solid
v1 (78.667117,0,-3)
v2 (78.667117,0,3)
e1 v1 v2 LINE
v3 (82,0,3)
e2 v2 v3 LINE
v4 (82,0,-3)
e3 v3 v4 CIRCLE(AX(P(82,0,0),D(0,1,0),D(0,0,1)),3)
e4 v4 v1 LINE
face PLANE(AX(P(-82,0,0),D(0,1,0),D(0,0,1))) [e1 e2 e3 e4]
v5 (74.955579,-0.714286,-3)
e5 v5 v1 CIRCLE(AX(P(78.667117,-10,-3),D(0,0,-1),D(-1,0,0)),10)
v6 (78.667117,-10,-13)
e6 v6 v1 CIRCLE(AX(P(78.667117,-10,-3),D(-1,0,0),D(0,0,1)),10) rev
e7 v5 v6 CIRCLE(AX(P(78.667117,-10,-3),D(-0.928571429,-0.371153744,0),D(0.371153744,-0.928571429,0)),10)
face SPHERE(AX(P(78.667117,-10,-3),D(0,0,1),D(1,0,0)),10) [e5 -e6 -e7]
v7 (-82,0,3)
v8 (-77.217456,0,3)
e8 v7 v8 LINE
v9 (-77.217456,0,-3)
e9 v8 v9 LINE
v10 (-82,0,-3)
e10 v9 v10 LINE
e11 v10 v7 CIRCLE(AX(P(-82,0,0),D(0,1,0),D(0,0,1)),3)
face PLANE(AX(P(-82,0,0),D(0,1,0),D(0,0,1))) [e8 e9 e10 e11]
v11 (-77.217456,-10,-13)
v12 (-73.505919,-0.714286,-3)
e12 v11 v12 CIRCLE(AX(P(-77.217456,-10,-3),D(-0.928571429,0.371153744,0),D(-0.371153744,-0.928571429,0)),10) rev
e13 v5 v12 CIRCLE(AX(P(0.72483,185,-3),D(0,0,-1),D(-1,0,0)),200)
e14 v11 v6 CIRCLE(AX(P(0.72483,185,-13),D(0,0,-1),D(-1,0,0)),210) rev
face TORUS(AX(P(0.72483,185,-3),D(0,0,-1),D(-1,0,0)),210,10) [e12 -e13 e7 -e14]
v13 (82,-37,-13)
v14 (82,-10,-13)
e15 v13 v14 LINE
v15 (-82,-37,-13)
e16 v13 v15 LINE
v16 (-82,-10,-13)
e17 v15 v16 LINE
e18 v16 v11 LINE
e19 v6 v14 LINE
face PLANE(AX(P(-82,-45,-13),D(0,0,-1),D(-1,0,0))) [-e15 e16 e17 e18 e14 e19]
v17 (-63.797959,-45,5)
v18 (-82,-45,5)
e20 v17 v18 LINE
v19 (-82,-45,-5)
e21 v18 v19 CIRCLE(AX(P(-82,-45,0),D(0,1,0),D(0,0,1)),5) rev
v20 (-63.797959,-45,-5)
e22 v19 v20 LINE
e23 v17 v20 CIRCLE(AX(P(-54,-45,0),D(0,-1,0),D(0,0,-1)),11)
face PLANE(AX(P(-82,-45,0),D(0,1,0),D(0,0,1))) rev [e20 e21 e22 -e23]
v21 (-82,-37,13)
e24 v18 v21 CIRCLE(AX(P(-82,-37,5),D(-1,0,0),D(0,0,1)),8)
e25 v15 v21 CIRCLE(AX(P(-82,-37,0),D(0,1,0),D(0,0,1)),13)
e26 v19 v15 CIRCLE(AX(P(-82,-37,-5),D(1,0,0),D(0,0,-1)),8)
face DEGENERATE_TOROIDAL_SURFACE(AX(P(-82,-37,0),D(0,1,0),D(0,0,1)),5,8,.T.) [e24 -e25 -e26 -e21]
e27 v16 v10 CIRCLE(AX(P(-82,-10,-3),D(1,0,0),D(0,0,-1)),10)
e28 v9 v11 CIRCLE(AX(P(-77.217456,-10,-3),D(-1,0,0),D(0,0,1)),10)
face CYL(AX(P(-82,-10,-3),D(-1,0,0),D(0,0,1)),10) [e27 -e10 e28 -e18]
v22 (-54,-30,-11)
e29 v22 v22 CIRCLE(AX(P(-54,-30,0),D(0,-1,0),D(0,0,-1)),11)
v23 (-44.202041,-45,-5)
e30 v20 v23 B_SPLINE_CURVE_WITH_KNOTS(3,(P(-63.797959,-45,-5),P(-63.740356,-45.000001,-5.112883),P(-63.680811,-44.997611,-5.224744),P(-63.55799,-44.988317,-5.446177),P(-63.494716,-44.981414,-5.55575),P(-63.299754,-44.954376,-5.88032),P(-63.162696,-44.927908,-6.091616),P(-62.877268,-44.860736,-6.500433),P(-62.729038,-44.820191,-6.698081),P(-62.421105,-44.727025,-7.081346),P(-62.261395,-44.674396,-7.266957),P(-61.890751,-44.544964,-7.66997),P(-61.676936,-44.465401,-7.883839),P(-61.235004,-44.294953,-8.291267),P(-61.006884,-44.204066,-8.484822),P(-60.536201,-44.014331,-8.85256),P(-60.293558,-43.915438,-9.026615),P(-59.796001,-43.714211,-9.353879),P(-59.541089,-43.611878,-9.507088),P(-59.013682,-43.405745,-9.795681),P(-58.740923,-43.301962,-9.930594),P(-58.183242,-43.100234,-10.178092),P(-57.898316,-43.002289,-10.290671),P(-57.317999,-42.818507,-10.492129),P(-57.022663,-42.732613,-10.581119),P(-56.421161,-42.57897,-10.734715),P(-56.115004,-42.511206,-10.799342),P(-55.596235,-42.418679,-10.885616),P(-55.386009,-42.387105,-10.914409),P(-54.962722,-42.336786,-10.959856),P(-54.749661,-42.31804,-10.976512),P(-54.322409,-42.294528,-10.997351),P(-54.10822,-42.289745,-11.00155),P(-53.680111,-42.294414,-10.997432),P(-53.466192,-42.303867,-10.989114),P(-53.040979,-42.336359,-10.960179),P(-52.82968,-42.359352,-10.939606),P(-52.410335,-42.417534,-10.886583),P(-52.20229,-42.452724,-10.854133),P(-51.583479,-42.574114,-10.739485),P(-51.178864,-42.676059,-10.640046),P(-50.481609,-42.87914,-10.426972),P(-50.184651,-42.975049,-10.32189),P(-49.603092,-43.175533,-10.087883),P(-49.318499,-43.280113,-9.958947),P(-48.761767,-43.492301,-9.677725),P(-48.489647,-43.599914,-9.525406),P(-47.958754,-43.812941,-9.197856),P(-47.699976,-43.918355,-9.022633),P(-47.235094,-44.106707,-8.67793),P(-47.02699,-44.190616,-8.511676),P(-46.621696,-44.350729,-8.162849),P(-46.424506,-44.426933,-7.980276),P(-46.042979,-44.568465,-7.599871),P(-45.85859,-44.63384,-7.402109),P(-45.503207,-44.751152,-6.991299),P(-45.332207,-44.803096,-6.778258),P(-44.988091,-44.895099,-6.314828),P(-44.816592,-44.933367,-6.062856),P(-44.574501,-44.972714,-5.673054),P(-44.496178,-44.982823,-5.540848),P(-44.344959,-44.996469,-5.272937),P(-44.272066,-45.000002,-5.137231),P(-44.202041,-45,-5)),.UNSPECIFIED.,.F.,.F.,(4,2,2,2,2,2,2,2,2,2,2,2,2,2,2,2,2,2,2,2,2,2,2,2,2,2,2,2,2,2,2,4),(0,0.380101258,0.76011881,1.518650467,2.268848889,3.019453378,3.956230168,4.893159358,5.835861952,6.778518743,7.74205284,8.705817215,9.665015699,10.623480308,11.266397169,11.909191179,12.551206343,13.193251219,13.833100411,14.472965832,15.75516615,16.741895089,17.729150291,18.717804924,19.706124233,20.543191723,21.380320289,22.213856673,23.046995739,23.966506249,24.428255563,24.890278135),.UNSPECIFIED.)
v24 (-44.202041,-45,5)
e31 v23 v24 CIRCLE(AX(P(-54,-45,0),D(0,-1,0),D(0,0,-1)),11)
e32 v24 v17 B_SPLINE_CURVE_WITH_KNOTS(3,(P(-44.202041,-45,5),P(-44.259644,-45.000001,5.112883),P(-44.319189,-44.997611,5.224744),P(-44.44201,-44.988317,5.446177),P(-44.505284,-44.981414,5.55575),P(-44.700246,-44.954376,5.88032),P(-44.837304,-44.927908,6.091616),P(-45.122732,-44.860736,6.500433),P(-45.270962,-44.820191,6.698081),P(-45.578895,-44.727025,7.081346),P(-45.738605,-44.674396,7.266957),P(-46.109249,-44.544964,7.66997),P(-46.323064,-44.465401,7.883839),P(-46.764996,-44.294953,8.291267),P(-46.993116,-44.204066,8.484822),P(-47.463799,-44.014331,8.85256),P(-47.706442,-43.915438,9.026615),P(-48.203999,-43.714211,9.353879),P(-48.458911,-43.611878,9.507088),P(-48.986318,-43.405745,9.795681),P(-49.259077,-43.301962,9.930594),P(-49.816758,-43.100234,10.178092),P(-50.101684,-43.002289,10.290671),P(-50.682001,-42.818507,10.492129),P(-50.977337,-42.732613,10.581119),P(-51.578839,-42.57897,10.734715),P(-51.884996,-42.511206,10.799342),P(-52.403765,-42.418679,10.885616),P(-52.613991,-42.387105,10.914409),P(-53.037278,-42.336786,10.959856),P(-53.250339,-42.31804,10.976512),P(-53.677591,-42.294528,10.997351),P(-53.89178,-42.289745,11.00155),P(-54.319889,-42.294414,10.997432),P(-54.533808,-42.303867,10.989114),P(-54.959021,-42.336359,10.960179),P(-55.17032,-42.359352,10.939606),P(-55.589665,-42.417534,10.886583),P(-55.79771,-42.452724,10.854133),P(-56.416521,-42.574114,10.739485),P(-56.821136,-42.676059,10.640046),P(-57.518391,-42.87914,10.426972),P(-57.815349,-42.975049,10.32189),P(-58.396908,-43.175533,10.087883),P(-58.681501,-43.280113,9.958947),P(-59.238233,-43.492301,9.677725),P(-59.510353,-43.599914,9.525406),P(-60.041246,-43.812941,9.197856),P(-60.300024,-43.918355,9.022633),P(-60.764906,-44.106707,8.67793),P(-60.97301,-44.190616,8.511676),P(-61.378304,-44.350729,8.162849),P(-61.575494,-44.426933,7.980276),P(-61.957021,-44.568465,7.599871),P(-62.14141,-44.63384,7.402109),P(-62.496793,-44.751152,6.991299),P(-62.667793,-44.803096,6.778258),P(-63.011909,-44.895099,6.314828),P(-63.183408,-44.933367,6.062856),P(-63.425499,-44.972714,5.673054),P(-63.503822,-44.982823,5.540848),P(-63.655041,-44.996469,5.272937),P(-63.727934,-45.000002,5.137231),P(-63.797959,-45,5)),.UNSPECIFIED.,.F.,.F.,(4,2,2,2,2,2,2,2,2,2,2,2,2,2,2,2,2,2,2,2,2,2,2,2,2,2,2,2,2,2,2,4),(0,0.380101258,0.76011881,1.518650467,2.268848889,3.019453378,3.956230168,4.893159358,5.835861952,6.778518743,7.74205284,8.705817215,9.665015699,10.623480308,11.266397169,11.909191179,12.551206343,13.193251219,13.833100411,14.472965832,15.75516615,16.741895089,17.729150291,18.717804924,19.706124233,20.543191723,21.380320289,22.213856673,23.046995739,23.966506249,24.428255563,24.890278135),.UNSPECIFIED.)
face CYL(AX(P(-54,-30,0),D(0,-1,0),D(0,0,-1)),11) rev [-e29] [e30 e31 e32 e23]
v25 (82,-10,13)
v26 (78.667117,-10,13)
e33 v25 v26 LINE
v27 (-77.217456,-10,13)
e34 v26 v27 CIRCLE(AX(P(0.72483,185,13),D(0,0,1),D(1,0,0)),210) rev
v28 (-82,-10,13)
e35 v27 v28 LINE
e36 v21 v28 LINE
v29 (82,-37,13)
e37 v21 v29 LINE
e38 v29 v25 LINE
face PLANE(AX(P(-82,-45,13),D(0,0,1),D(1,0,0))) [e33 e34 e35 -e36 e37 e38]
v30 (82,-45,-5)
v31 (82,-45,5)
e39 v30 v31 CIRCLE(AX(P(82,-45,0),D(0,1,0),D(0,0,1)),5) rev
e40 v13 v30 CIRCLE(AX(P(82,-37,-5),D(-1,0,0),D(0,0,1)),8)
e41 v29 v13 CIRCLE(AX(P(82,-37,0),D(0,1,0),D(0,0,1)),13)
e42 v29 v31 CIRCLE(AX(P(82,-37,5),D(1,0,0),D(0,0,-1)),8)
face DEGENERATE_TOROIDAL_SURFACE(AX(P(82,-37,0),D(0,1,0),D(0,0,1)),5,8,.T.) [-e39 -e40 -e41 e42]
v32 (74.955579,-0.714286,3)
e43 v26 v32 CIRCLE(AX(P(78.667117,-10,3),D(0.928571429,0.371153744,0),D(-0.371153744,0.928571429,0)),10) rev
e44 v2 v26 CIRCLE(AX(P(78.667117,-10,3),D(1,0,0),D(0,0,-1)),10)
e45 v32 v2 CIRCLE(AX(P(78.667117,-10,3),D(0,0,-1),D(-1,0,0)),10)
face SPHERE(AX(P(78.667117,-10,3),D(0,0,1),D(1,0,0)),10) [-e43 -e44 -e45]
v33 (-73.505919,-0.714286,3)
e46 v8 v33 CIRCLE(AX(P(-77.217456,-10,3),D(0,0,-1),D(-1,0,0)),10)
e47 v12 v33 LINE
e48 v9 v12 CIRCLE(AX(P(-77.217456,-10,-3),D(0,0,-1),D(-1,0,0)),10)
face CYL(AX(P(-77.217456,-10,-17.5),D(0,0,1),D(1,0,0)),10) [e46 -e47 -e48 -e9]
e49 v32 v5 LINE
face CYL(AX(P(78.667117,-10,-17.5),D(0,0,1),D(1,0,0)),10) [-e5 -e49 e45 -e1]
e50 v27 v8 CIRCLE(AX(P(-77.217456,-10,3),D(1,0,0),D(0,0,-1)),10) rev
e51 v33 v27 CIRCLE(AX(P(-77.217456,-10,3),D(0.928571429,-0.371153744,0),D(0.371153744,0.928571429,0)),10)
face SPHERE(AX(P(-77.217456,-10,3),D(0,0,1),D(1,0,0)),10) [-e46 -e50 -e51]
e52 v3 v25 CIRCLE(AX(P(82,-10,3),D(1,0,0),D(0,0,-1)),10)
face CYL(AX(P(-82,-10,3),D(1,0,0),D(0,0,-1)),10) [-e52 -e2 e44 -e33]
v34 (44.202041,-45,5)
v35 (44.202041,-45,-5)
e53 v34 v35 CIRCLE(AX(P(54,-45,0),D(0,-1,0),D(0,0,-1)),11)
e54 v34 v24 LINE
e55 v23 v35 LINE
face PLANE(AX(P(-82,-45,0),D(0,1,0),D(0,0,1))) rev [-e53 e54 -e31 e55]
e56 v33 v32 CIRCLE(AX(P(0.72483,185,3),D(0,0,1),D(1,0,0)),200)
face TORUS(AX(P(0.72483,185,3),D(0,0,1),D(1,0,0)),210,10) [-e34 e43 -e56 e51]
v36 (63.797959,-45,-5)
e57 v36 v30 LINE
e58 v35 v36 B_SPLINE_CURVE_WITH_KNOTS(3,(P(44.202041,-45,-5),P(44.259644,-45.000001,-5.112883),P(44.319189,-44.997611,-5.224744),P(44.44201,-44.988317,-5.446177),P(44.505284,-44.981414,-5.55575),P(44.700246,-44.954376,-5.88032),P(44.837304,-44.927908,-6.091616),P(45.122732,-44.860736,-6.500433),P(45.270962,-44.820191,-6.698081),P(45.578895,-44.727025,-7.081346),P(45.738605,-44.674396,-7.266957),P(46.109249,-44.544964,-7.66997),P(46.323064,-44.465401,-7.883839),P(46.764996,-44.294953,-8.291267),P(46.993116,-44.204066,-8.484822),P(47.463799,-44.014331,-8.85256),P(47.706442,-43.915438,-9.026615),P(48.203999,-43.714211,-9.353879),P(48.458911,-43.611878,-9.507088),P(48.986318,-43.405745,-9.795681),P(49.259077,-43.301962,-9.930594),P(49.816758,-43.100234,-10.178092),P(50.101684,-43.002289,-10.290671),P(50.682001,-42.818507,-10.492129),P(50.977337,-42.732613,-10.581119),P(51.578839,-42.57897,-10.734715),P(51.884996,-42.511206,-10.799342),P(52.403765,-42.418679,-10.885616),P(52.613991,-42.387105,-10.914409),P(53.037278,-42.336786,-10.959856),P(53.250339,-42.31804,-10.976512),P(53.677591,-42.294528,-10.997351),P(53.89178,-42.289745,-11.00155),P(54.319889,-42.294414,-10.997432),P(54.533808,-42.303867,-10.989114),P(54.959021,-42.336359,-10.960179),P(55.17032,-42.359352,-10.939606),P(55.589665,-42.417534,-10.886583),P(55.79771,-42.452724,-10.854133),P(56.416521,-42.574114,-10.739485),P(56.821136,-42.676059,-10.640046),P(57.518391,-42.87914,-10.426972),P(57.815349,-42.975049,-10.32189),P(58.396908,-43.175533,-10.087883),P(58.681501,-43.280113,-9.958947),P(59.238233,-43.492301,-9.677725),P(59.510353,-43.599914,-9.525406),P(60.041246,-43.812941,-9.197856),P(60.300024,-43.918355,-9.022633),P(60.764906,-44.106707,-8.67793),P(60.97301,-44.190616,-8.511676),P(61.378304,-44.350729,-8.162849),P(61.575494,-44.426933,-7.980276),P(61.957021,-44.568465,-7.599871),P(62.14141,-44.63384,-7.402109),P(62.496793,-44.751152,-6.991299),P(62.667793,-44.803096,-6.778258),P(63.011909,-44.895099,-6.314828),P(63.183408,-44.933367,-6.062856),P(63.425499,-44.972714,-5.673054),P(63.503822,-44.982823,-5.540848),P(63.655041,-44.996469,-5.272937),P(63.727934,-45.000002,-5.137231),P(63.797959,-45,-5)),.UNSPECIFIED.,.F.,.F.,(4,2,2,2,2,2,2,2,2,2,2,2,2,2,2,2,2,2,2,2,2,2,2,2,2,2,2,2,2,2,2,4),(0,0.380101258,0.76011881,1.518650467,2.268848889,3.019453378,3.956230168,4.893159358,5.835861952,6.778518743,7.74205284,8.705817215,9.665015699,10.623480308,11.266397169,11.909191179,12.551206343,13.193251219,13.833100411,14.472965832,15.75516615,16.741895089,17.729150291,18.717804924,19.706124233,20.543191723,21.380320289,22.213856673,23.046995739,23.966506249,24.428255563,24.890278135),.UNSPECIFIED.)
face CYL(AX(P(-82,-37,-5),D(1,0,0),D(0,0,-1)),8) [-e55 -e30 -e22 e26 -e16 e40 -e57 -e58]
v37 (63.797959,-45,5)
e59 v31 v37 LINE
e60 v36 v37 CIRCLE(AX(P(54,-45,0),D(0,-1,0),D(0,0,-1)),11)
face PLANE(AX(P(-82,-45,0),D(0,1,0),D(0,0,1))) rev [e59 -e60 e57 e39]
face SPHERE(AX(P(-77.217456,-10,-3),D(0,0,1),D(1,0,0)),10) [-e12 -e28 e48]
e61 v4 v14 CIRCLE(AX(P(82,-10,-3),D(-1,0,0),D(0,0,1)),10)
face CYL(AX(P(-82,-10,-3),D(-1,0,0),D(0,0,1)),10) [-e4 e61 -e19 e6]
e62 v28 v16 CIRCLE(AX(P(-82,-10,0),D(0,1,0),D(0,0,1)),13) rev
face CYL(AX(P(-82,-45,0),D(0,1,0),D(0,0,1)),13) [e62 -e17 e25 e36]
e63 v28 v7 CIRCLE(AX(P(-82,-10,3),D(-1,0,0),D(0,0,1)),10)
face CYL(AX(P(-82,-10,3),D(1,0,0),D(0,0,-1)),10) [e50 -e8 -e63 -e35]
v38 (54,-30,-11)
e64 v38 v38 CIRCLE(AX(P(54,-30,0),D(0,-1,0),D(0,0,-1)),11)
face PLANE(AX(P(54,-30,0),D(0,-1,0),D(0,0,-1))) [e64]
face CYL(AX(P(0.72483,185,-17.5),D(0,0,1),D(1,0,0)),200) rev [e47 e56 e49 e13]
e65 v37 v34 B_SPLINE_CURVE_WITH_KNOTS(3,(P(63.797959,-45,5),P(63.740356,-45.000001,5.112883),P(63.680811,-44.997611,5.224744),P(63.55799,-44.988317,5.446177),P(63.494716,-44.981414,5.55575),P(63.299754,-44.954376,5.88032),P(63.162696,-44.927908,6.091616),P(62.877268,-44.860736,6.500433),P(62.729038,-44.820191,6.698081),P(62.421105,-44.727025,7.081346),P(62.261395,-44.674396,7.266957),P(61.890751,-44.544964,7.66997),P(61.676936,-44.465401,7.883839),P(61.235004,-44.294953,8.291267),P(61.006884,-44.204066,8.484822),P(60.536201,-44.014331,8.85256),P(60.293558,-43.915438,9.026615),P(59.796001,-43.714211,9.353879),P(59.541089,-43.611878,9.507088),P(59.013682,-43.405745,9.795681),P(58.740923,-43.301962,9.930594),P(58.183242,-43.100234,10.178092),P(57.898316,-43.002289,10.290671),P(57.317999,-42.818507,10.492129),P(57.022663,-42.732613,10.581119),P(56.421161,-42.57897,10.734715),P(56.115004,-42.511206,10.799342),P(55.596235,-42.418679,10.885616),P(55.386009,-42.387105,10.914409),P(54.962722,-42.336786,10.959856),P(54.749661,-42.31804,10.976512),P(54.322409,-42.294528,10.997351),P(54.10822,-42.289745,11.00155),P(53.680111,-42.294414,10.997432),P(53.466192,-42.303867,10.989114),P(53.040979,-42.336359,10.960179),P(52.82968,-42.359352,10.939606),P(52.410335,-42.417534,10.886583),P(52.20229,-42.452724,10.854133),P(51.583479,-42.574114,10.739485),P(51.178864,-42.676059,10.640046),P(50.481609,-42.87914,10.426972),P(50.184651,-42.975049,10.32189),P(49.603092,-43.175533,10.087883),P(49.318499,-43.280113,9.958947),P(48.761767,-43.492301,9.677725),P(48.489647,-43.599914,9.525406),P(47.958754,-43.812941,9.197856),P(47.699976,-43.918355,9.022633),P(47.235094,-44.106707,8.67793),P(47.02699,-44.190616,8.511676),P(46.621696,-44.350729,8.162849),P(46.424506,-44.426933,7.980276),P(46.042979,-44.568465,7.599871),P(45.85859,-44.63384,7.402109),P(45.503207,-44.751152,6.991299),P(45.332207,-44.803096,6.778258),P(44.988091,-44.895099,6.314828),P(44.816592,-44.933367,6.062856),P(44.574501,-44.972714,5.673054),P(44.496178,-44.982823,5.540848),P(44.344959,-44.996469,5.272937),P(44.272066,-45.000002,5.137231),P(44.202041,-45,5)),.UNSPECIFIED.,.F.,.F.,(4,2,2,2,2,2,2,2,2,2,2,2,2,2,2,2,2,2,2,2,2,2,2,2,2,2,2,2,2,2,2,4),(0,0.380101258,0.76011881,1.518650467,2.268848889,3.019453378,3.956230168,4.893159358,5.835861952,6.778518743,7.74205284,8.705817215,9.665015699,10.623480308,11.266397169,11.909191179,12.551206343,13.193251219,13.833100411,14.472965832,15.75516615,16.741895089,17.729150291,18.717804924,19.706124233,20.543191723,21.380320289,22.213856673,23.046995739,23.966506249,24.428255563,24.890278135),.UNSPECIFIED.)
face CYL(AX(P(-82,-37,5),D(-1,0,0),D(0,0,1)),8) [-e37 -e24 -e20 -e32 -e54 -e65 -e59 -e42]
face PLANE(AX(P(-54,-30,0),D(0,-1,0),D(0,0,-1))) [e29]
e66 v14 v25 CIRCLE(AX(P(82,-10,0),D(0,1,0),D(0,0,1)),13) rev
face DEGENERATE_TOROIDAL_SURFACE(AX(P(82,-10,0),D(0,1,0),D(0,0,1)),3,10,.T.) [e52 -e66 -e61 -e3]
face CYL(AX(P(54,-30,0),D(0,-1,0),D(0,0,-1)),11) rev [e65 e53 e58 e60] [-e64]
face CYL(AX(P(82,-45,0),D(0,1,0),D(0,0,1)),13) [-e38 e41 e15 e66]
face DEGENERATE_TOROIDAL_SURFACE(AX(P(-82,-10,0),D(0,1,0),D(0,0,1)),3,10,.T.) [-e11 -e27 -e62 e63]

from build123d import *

# Parameters (mm, degrees)
BOSS_EXTRUDE1_DEPTH = 45
SKETCH2_R           = 11
CUT_EXTRUDE1_DEPTH  = 15
SKETCH4_R           = 200
CUT_EXTRUDE2_DEPTH  = 17.5
FILLET1_R           = 8
FILLET2_R           = 10
FILLET3_R           = 10


with BuildPart() as part:
    # Sketch1 → Boss-Extrude1 (new body)
    with BuildSketch(Plane(origin=(0, 0, 0), x_dir=(1, 0, 0), z_dir=(0, 1, 0))):
        with BuildLine():
            Line((-82, 13), (82, 13))
            ThreePointArc((82, 13), (95, 0), (82, -13))
            Line((82, -13), (-82, -13))
            ThreePointArc((-82, -13), (-95, 0), (-82, 13))
        make_face()
    extrude(amount=-BOSS_EXTRUDE1_DEPTH)

    # Sketch2 → Cut-Extrude1 (cut)
    with BuildSketch(Plane.XZ.offset(45)):
        with Locations(Location((-54, 0, 0), (0, 0, 270))):
            Circle(SKETCH2_R)
        with Locations(Location((54, 0, 0), (0, 0, 270))):
            Circle(SKETCH2_R)
    extrude(amount=-CUT_EXTRUDE1_DEPTH, mode=Mode.SUBTRACT)

    # Sketch4 → Cut-Extrude2 (cut, symmetric)
    with BuildSketch(Plane.XY):
        with Locations((0.724830201, 185)):
            Circle(SKETCH4_R)
    extrude(amount=CUT_EXTRUDE2_DEPTH, both=True, mode=Mode.SUBTRACT)

    # Fillet1
    # the kernel refuses this fillet: 8 mm, written as the material it takes off along each edge
    with BuildSketch(Plane(origin=(82, -45, 0), x_dir=(0, 0, -1), z_dir=(-1, 0, 0))) as fillet1_piece_1:
        with BuildLine():
            CenterArc((13 - FILLET1_R, -FILLET1_R), FILLET1_R, 0, 90)
            Line((13, -FILLET1_R), (13, 0))
            Line((13, 0), (13 - FILLET1_R, 0))
        make_face()
    revolve(axis=Axis((82, -45, 0), (0, -1, 0)), revolution_arc=180, mode=Mode.SUBTRACT)
    with BuildSketch(Plane(origin=(-82, -45, -13), x_dir=(0, 0, 1), z_dir=(1, 0, 0))) as fillet1_piece_2:
        with BuildLine():
            CenterArc((FILLET1_R, -FILLET1_R), FILLET1_R, 90, 90)
            Line((0, -FILLET1_R), (0, 0))
            Line((0, 0), (FILLET1_R, 0))
        make_face()
    extrude(amount=164, mode=Mode.SUBTRACT)
    with BuildSketch(Plane(origin=(-82, -45, 0), x_dir=(0, 0, 1), z_dir=(1, 0, 0))) as fillet1_piece_3:
        with BuildLine():
            CenterArc((13 - FILLET1_R, -FILLET1_R), FILLET1_R, 0, 90)
            Line((13 - FILLET1_R, 0), (13, 0))
            Line((13, 0), (13, -FILLET1_R))
        make_face()
    revolve(axis=Axis((-82, -45, 0), (0, -1, 0)), revolution_arc=180, mode=Mode.SUBTRACT)
    with BuildSketch(Plane(origin=(82, -45, 13), x_dir=(0, 1, 0), z_dir=(-1, 0, 0))) as fillet1_piece_4:
        with BuildLine():
            CenterArc((FILLET1_R, FILLET1_R), FILLET1_R, 180, 90)
            Line((0, FILLET1_R), (0, 0))
            Line((0, 0), (FILLET1_R, 0))
        make_face()
    extrude(amount=164, mode=Mode.SUBTRACT)

    # Fillet2
    # the kernel refuses this fillet: 10 mm, written as the material it takes off along each edge
    with BuildSketch(Plane(origin=(82, 0, 13), x_dir=(0, -1, 0), z_dir=(-1, 0, 0))) as fillet2_piece_1:
        with BuildLine():
            CenterArc((FILLET2_R, -FILLET2_R), FILLET2_R, 90, 90)
            Line((0, -FILLET2_R), (0, 0))
            Line((0, 0), (FILLET2_R, 0))
        make_face()
    extrude(amount=30.281749031, mode=Mode.SUBTRACT)
    with BuildSketch(Plane(origin=(-82, 0, -13), x_dir=(0, 0, 1), z_dir=(1, 0, 0))) as fillet2_piece_2:
        with BuildLine():
            CenterArc((FILLET2_R, FILLET2_R), FILLET2_R, 180, 90)
            Line((0, FILLET2_R), (0, 0))
            Line((0, 0), (FILLET2_R, 0))
        make_face()
    extrude(amount=31.731409434, mode=Mode.SUBTRACT)
    with BuildSketch(Plane(origin=(0.724830201, 185, -13), x_dir=(-0.49233736380683973, -0.8704044578239082, 0), z_dir=(-0.8704044578239082, 0.49233736380683973, 0))) as fillet2_piece_3:
        with BuildLine():
            CenterArc((200 + FILLET2_R, FILLET2_R), FILLET2_R, 180, 90)
            Line((200 + FILLET2_R, 0), (200, 0))
            Line((200, 0), (200, FILLET2_R))
        make_face()
    revolve(axis=Axis((0.724830201, 185, -13), (0, 0, 1)), revolution_arc=58.988651661, mode=Mode.SUBTRACT)
    with BuildSketch(Plane(origin=(0.724830201, 185, 13), x_dir=(-0.49233736380683973, -0.8704044578239082, 0), z_dir=(-0.8704044578239082, 0.49233736380683973, 0))) as fillet2_piece_4:
        with BuildLine():
            CenterArc((200 + FILLET2_R, -FILLET2_R), FILLET2_R, 90, 90)
            Line((200, -FILLET2_R), (200, 0))
            Line((200, 0), (200 + FILLET2_R, 0))
        make_face()
    revolve(axis=Axis((0.724830201, 185, 13), (0, 0, 1)), revolution_arc=58.988651661, mode=Mode.SUBTRACT)
    with BuildSketch(Plane(origin=(51.718250969, 0, -13), x_dir=(0, 0, 1), z_dir=(1, 0, 0))) as fillet2_piece_5:
        with BuildLine():
            CenterArc((FILLET2_R, FILLET2_R), FILLET2_R, 180, 90)
            Line((0, FILLET2_R), (0, 0))
            Line((0, 0), (FILLET2_R, 0))
        make_face()
    extrude(amount=30.281749031, mode=Mode.SUBTRACT)
    with BuildSketch(Plane(origin=(82, 0, 0), x_dir=(0, 0, -1), z_dir=(-1, 0, 0))) as fillet2_piece_6:
        with BuildLine():
            CenterArc((13 - FILLET2_R, FILLET2_R), FILLET2_R, 270, 90)
            Line((13, FILLET2_R), (13, 0))
            Line((13, 0), (13 - FILLET2_R, 0))
        make_face()
    revolve(axis=Axis((82, 0, 0), (0, -1, 0)), revolution_arc=180, mode=Mode.SUBTRACT)
    with BuildSketch(Plane(origin=(-50.268590566, 0, 13), x_dir=(0, -1, 0), z_dir=(-1, 0, 0))) as fillet2_piece_7:
        with BuildLine():
            CenterArc((FILLET2_R, -FILLET2_R), FILLET2_R, 90, 90)
            Line((0, -FILLET2_R), (0, 0))
            Line((0, 0), (FILLET2_R, 0))
        make_face()
    extrude(amount=31.731409434, mode=Mode.SUBTRACT)
    with BuildSketch(Plane(origin=(-82, 0, 0), x_dir=(0, 0, 1), z_dir=(1, 0, 0))) as fillet2_piece_8:
        with BuildLine():
            CenterArc((13 - FILLET2_R, FILLET2_R), FILLET2_R, 270, 90)
            Line((13, FILLET2_R), (13, 0))
            Line((13, 0), (13 - FILLET2_R, 0))
        make_face()
    revolve(axis=Axis((-82, 0, 0), (0, -1, 0)), revolution_arc=180, mode=Mode.SUBTRACT)

    # Fillet3
    fillet3_edges = [part.edges().sort_by_distance(p)[0] for p in [
        (-75.268590566, 0, 0),
        (76.718250969, 0, 0),
        (77.300565536, -2.961441402, 10.103428202),
        (-75.850905134, -2.961441403, 10.103428203),
        (77.300565536, -2.961441402, -10.103428202),
        (-75.850905134, -2.961441403, -10.103428203),
    ]]
    fillet(fillet3_edges, radius=FILLET3_R)


solid = part.part
